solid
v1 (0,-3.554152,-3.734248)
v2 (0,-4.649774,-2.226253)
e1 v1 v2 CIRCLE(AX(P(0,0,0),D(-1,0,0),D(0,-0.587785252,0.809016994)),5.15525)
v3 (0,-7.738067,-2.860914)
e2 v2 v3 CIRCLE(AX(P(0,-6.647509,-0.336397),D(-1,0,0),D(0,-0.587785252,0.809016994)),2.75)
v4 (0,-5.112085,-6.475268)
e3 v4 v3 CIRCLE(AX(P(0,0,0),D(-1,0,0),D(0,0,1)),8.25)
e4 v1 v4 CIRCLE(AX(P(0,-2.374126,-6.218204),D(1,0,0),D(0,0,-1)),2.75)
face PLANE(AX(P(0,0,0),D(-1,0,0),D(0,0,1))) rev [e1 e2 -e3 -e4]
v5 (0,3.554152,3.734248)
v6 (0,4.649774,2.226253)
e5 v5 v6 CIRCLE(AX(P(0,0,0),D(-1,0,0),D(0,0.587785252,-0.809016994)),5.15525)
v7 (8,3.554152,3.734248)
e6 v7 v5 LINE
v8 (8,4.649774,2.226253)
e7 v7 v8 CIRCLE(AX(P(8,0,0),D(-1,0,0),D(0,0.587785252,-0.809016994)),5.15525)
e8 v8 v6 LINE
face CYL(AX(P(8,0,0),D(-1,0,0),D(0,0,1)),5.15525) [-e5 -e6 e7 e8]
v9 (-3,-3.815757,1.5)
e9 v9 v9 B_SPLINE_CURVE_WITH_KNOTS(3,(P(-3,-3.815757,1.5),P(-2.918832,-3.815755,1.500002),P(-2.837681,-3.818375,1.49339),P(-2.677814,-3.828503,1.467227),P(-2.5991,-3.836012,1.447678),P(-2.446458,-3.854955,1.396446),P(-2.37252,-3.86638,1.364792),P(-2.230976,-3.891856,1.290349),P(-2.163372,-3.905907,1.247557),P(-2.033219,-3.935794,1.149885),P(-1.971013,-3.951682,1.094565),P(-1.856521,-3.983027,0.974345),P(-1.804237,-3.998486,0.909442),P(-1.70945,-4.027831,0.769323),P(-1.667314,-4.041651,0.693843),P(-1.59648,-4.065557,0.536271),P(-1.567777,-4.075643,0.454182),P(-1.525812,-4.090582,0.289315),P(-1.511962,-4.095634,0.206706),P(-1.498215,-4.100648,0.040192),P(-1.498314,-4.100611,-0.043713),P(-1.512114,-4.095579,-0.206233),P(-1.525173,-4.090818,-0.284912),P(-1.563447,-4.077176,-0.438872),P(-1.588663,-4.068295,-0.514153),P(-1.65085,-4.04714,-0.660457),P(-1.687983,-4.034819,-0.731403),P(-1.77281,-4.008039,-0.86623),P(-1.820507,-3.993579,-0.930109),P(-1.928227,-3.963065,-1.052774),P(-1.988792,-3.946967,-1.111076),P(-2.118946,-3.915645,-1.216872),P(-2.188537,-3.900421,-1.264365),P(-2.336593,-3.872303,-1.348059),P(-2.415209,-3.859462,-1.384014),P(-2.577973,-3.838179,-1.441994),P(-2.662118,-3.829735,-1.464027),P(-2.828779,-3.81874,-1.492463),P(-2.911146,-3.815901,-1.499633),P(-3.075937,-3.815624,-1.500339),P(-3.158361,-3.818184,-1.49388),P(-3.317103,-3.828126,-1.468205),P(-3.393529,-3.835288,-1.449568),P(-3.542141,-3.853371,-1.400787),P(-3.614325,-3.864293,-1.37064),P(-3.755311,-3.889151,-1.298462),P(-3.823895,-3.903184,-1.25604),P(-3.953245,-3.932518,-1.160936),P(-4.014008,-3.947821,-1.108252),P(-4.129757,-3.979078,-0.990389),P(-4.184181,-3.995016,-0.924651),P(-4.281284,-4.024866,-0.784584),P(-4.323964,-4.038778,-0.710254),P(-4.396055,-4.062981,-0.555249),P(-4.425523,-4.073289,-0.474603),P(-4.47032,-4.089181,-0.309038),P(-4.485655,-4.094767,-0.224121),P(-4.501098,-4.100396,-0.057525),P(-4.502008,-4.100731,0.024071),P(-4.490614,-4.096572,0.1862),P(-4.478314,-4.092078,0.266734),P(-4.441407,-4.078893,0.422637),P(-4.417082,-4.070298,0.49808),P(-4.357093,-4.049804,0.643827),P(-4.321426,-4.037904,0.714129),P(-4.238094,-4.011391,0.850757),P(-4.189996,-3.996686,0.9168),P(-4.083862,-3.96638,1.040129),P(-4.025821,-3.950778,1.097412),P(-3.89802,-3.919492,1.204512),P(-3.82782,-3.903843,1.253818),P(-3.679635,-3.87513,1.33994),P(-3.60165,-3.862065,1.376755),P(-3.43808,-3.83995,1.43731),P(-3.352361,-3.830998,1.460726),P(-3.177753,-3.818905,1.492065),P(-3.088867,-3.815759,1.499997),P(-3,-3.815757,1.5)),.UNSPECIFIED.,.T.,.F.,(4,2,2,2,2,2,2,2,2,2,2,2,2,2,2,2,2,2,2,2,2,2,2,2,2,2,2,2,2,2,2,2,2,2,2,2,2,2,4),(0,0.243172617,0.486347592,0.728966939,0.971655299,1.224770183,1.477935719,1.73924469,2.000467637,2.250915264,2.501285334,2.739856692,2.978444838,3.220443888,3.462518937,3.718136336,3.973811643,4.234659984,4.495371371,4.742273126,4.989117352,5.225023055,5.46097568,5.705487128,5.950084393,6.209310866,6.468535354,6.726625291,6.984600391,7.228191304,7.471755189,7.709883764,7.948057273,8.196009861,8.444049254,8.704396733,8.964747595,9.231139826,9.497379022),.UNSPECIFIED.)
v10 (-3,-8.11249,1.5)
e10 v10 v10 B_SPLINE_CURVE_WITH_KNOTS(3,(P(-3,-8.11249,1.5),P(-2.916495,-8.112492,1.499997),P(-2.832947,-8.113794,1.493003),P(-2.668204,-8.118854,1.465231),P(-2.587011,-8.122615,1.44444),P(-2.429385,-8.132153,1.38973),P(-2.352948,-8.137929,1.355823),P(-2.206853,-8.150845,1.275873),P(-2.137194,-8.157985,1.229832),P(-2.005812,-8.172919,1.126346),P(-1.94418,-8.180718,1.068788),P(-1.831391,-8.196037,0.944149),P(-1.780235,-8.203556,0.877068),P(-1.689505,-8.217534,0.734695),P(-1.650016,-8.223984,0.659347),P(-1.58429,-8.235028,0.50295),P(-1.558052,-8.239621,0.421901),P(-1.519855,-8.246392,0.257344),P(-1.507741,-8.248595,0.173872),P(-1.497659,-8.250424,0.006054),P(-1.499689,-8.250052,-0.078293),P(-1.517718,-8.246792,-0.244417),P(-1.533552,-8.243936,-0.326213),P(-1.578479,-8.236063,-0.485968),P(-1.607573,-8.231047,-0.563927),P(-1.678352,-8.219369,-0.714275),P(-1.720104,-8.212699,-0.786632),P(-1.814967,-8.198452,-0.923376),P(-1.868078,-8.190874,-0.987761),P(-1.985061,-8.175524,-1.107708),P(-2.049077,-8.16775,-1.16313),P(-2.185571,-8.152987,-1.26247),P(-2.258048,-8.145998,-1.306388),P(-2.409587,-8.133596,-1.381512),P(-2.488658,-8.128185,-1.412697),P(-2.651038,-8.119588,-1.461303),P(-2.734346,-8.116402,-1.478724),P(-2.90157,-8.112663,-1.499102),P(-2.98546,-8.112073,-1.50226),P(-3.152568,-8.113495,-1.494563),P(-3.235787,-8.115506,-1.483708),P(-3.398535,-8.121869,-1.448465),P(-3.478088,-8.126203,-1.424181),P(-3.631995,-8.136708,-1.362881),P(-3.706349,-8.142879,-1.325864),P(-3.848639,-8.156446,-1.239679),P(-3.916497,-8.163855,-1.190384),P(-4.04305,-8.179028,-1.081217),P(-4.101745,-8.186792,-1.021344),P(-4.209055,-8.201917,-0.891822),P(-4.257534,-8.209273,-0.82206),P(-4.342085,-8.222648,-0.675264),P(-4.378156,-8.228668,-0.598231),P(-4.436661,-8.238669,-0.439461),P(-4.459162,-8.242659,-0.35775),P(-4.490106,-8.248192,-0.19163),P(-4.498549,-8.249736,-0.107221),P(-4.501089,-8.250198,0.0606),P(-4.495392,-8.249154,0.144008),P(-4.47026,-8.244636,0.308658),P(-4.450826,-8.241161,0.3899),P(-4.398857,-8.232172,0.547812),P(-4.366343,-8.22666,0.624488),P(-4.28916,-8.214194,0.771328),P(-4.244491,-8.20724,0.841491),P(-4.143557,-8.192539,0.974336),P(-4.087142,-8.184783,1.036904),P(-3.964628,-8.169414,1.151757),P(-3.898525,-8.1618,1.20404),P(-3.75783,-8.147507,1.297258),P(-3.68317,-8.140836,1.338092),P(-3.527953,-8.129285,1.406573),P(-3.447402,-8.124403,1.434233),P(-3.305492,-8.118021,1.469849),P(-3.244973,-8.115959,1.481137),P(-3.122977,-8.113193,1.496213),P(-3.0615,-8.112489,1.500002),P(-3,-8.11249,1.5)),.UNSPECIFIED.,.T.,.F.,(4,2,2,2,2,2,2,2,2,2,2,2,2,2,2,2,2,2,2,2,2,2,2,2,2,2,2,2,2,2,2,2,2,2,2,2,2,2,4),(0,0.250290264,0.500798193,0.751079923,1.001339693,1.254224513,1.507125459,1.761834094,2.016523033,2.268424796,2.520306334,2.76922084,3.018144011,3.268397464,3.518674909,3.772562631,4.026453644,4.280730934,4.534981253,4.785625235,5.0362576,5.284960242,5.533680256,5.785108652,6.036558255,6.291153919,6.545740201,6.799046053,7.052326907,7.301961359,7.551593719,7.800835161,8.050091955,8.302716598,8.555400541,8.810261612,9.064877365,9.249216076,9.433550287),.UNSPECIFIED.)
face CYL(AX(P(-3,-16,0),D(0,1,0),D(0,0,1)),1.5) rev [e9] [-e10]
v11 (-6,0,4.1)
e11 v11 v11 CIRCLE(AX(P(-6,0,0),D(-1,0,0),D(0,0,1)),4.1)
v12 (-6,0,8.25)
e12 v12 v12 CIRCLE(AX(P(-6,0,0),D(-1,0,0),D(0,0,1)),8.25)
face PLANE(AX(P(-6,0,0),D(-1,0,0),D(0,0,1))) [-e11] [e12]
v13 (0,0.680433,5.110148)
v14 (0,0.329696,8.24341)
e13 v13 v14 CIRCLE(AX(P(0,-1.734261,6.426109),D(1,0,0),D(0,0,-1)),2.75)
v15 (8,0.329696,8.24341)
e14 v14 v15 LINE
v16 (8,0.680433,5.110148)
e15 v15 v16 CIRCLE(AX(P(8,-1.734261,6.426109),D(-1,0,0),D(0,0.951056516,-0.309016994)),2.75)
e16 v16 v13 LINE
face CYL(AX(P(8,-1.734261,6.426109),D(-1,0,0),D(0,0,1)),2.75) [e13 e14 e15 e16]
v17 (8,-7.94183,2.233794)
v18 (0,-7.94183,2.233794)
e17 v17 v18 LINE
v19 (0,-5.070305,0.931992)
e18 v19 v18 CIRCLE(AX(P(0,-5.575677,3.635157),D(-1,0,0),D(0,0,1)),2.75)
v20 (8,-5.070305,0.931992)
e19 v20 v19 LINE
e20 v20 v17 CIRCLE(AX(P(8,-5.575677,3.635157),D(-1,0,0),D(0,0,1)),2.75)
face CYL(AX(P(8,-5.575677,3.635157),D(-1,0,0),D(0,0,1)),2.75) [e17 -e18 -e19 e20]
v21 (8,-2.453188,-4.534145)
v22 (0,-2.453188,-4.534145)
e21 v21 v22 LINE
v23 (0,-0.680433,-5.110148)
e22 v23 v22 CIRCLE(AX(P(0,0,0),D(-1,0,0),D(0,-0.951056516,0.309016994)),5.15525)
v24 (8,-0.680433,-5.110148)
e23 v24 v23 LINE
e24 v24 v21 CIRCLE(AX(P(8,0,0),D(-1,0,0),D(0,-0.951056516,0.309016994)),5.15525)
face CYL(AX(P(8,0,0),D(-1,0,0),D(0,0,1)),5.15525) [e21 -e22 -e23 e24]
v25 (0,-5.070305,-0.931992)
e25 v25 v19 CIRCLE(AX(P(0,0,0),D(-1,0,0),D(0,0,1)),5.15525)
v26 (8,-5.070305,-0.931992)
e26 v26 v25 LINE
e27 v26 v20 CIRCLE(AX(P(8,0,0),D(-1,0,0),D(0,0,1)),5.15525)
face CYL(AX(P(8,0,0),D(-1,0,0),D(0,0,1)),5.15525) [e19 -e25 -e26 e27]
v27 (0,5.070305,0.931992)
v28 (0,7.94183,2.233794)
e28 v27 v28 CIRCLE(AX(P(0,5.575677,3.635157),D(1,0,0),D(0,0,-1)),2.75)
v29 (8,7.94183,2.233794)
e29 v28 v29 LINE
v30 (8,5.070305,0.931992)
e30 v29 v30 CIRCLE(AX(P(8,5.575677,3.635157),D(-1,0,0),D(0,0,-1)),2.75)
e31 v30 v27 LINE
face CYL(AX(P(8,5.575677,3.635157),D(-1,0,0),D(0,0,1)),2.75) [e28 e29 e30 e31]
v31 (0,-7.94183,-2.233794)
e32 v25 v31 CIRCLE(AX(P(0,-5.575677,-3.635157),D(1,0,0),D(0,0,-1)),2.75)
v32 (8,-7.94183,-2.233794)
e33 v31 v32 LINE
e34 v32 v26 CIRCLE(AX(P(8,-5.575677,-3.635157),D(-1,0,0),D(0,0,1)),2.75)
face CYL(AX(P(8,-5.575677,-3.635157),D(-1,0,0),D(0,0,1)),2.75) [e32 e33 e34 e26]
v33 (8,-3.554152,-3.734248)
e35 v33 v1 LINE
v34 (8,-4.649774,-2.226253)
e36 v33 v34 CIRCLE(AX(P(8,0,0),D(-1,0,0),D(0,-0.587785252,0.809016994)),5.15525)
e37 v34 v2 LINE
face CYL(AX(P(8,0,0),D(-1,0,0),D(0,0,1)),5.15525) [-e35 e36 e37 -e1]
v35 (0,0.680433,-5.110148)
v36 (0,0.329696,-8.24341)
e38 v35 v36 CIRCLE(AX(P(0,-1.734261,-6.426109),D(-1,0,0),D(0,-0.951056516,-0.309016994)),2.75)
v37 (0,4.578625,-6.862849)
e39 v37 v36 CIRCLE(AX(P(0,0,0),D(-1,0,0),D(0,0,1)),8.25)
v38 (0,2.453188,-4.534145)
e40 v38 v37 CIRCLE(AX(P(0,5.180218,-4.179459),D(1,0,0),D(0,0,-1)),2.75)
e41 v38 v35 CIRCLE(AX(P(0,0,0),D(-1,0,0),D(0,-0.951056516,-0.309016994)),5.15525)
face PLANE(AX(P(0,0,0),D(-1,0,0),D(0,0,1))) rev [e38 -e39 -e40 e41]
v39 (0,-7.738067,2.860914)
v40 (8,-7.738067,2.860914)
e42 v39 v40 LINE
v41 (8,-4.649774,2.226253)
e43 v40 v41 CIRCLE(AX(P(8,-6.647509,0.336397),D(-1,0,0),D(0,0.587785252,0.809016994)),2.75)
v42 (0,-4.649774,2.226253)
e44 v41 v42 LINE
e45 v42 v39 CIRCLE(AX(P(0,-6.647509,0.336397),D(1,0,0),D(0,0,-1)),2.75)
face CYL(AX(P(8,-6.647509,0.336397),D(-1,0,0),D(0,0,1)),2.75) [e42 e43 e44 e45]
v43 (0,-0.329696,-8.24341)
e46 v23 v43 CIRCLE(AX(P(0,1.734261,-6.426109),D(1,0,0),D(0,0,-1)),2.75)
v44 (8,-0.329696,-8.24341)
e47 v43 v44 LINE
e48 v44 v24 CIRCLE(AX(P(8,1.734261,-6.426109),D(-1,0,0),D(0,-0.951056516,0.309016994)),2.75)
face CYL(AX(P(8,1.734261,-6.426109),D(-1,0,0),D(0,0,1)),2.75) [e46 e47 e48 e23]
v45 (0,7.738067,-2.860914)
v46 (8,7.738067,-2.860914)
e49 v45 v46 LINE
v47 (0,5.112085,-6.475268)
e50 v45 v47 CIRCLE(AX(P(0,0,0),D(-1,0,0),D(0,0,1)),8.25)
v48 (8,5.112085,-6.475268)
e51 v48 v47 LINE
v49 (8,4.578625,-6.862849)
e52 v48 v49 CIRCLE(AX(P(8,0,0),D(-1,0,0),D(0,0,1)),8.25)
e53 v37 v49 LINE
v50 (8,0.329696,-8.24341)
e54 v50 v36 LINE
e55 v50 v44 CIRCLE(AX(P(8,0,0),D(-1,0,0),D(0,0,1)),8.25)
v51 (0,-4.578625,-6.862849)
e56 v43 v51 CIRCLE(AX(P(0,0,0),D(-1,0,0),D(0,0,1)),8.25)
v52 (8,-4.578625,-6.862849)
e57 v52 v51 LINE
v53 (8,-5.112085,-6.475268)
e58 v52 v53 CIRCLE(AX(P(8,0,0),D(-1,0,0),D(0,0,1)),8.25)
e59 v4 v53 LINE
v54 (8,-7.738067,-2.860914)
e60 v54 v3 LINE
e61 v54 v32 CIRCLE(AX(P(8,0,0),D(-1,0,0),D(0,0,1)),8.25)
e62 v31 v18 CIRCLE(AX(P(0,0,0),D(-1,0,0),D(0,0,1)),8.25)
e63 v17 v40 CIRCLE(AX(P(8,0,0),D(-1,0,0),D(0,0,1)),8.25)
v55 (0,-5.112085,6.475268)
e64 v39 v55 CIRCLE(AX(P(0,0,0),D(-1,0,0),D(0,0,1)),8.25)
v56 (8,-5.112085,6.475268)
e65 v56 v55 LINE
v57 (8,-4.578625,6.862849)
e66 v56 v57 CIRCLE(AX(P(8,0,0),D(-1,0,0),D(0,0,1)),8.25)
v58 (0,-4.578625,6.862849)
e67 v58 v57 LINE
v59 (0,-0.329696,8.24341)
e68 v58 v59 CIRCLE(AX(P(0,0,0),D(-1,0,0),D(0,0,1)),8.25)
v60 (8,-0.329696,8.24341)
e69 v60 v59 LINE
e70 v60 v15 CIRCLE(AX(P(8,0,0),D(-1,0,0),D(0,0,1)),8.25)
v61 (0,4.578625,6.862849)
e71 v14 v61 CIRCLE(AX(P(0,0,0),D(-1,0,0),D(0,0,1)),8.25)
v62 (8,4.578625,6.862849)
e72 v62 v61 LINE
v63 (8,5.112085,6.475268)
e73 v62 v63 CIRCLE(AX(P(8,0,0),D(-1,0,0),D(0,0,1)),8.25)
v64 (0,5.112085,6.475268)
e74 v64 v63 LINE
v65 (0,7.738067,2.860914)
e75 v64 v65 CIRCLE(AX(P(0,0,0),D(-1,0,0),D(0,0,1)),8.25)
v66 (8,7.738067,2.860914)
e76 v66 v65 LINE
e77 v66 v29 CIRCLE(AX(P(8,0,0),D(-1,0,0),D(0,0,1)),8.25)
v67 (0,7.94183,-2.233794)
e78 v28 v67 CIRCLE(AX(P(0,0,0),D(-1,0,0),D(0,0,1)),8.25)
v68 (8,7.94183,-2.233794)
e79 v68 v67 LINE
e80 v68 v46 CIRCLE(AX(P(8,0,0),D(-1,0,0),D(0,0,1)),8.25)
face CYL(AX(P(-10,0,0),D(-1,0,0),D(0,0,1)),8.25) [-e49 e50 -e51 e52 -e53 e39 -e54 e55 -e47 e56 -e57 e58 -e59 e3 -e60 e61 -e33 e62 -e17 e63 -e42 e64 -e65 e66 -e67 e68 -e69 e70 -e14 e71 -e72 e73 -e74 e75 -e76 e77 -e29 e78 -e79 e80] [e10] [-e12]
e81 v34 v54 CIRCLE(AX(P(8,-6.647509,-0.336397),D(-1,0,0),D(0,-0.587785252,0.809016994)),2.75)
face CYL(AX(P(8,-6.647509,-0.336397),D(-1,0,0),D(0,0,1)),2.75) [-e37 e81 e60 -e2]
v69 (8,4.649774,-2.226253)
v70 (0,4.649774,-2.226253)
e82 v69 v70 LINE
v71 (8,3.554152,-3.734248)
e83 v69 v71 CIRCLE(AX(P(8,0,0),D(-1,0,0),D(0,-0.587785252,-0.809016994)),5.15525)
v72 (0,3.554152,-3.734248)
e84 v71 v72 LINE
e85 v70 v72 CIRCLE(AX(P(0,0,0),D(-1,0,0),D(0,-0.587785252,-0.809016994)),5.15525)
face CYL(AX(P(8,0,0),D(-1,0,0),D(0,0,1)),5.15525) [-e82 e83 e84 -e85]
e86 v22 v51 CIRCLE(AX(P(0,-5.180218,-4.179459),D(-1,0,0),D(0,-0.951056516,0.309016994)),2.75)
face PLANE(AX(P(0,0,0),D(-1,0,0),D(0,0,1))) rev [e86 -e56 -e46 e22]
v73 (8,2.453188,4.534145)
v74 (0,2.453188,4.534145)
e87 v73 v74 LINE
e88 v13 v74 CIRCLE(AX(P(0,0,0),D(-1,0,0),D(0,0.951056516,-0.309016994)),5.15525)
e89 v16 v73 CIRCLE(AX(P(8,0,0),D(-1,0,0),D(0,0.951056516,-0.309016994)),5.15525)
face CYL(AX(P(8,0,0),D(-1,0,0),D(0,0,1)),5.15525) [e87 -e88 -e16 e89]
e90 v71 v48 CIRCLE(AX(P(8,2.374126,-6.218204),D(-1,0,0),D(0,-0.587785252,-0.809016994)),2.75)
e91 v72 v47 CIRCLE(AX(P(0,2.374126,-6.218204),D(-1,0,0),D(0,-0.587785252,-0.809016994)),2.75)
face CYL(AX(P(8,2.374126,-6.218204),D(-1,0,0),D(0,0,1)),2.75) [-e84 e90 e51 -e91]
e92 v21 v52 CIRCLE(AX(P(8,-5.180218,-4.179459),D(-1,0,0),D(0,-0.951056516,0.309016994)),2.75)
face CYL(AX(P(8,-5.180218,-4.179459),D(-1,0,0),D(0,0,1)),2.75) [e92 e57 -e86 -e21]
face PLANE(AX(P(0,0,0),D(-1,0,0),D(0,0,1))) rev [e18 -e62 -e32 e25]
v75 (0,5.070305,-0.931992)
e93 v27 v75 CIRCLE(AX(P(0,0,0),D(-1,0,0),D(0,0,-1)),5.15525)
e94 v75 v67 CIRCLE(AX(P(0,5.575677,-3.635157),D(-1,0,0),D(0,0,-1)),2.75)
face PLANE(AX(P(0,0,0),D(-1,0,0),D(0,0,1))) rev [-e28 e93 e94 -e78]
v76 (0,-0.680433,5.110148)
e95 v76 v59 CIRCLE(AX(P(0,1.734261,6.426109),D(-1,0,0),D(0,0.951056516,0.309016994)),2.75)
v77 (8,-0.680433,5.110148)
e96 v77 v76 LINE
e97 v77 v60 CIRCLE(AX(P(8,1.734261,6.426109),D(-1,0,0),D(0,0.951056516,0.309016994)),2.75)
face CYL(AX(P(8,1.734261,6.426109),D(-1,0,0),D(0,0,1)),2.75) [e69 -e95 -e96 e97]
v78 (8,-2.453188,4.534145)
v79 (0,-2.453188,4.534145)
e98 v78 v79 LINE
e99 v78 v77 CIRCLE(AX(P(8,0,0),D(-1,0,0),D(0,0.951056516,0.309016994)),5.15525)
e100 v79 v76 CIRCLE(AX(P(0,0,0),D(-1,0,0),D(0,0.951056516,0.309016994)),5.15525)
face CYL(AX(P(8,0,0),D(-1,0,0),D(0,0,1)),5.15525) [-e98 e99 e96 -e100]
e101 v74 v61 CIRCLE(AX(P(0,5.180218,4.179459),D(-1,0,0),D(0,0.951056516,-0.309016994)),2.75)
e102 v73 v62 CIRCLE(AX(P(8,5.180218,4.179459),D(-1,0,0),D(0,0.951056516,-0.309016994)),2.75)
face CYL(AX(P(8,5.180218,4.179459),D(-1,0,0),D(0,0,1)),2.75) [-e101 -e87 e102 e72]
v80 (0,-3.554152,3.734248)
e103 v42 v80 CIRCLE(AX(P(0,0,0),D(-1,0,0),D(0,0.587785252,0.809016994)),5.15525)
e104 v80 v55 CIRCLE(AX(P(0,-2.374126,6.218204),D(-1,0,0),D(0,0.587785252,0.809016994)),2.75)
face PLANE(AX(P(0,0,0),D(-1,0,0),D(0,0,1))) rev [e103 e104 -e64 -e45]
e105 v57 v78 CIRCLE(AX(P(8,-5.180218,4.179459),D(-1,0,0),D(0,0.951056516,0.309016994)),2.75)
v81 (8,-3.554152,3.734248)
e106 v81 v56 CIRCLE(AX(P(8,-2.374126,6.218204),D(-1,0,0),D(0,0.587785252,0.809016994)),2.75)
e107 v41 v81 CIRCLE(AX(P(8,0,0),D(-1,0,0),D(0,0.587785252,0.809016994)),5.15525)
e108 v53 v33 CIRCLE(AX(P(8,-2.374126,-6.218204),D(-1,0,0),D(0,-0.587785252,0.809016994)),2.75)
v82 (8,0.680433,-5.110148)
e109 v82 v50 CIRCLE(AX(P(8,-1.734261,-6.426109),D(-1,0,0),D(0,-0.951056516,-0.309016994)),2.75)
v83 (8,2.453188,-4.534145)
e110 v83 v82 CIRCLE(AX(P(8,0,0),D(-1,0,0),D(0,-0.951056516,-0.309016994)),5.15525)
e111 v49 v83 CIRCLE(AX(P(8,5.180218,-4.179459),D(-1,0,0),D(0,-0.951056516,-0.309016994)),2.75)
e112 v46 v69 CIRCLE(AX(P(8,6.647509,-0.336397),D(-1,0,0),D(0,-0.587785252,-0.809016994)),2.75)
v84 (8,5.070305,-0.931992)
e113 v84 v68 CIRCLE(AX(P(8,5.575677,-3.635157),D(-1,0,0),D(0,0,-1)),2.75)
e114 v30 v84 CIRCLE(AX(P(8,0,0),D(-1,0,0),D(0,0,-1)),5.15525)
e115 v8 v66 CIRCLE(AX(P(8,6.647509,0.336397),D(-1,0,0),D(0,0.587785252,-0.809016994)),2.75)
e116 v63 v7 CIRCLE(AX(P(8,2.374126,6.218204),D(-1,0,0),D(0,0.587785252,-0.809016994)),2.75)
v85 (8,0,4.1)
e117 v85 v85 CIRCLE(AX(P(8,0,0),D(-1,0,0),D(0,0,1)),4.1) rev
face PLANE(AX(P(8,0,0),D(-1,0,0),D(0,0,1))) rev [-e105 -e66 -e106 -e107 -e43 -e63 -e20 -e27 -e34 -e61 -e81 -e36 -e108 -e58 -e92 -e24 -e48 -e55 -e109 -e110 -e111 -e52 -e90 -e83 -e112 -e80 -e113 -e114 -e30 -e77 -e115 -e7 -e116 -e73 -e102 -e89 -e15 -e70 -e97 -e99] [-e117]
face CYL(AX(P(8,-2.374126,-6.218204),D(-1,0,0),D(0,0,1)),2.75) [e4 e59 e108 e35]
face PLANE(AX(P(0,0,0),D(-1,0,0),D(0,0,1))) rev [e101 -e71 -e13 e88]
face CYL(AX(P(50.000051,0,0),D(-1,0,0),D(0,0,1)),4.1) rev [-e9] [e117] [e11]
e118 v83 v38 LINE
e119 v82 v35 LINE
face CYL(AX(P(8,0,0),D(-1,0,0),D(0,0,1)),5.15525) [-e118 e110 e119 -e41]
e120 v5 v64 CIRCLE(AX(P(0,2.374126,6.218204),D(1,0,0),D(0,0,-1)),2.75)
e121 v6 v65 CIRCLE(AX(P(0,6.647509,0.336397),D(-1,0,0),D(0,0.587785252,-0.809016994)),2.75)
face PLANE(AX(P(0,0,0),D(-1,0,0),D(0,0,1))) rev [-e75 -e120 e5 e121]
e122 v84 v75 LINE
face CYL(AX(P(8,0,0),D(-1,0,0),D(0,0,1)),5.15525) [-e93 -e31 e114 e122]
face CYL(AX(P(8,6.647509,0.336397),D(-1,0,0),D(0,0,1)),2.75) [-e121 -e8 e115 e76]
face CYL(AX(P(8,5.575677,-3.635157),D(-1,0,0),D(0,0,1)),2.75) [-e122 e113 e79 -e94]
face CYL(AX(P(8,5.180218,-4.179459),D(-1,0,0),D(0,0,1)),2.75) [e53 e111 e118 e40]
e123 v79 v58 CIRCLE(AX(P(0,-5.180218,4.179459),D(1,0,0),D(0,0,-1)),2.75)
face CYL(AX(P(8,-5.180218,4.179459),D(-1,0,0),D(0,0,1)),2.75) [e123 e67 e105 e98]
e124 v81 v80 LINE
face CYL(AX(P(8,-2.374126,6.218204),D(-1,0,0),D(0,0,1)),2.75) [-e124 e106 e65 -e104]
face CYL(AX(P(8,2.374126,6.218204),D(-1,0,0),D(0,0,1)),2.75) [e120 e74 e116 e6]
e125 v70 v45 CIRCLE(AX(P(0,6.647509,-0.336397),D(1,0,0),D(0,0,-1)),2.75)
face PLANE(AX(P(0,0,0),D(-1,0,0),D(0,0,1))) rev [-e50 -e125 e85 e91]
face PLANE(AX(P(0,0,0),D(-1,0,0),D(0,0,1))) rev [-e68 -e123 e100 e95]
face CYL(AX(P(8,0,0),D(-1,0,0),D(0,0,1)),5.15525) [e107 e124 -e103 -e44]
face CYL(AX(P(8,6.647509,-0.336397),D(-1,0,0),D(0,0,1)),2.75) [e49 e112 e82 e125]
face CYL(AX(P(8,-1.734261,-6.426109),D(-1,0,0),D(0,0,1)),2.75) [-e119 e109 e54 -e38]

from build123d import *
from build123d.topology import SkipClean

# Parameters (mm, degrees)
BASPROSKE_W         = 8
BASPROSKE_H         = 8.25
TOOTHCUT_DEPTH      = 15.146554351
TEETHCUTS_COUNT     = 10
TEETHCUTS_ANGLE     = 324
BORSKE_R            = 4.1
BORE_DEPTH          = 50.0000508
SKETCH_1_R          = 8.25
SKETCH_1_R_2        = 4.1
EXTRUDE_3_DEPTH     = 6
SKETCH_2_R          = 1.5
CUT_EXTRUDE_1_DEPTH = 16


with BuildPart() as part:
    # BasProSke → Base-Revolve (revolve)
    with BuildSketch(Plane(origin=(0, 0, 0), x_dir=(1, 0, 0), z_dir=(0, 1, 0))):
        with Locations((4, 4.125)):
            Rectangle(BASPROSKE_W, BASPROSKE_H)
    revolve(axis=Axis((-10, 0, 0), (1, 0, 0)))

    # TooCutSke → ToothCut (cut, through all)
    with BuildSketch(Plane(origin=(0, 0, 0), x_dir=(0, 0, -1), z_dir=(1, 0, 0))):
        with BuildLine():
            ThreePointArc((0.931992048, 5.070305058), (0, 5.15525), (-0.931992048, 5.070305058))
            ThreePointArc((-0.931992048, 5.070305058), (-1.137854344, 6.727189108), (-2.264257491, 7.959609486))
            ThreePointArc((-2.264257491, 7.959609486), (0, 8.2754), (2.264257491, 7.959609486))
            ThreePointArc((2.264257491, 7.959609486), (1.137854344, 6.727189108), (0.931992048, 5.070305058))
        make_face()
    toothcut = extrude(amount=TOOTHCUT_DEPTH, mode=Mode.SUBTRACT)

    # TeethCuts: ToothCut ×10 about axis
    teethcuts_axis = Axis((-10, 0, 0), (1, 0, 0))
    for i in range(1, TEETHCUTS_COUNT):
        add(toothcut.rotate(teethcuts_axis, i * TEETHCUTS_ANGLE / (TEETHCUTS_COUNT - 1)), mode=Mode.SUBTRACT)

    # BorSke → Bore (cut, symmetric)
    with BuildSketch(Plane(origin=(0, 0, 0), x_dir=(0, 0, -1), z_dir=(1, 0, 0))):
        Circle(BORSKE_R)
    extrude(amount=BORE_DEPTH, both=True, mode=Mode.SUBTRACT)

    # 草图1 → 凸台-拉伸3 (add)
    with SkipClean():  # the faces are left unmerged after this step: merging them gives an invalid solid
        with BuildSketch(Plane.ZY):
            Circle(SKETCH_1_R)
            Circle(SKETCH_1_R_2, mode=Mode.SUBTRACT)
        extrude(amount=EXTRUDE_3_DEPTH)
    add(part.part.scale(1), mode=Mode.REPLACE)  # the faces are merged on a copy

    # 草图2 → 切除-拉伸1 (cut)
    with BuildSketch(Plane(origin=(0, 0, 0), x_dir=(1, 0, 0), z_dir=(0, 1, 0))):
        with Locations((-3, 0)):
            Circle(SKETCH_2_R)
    extrude(amount=-CUT_EXTRUDE_1_DEPTH, mode=Mode.SUBTRACT)


solid = part.part
